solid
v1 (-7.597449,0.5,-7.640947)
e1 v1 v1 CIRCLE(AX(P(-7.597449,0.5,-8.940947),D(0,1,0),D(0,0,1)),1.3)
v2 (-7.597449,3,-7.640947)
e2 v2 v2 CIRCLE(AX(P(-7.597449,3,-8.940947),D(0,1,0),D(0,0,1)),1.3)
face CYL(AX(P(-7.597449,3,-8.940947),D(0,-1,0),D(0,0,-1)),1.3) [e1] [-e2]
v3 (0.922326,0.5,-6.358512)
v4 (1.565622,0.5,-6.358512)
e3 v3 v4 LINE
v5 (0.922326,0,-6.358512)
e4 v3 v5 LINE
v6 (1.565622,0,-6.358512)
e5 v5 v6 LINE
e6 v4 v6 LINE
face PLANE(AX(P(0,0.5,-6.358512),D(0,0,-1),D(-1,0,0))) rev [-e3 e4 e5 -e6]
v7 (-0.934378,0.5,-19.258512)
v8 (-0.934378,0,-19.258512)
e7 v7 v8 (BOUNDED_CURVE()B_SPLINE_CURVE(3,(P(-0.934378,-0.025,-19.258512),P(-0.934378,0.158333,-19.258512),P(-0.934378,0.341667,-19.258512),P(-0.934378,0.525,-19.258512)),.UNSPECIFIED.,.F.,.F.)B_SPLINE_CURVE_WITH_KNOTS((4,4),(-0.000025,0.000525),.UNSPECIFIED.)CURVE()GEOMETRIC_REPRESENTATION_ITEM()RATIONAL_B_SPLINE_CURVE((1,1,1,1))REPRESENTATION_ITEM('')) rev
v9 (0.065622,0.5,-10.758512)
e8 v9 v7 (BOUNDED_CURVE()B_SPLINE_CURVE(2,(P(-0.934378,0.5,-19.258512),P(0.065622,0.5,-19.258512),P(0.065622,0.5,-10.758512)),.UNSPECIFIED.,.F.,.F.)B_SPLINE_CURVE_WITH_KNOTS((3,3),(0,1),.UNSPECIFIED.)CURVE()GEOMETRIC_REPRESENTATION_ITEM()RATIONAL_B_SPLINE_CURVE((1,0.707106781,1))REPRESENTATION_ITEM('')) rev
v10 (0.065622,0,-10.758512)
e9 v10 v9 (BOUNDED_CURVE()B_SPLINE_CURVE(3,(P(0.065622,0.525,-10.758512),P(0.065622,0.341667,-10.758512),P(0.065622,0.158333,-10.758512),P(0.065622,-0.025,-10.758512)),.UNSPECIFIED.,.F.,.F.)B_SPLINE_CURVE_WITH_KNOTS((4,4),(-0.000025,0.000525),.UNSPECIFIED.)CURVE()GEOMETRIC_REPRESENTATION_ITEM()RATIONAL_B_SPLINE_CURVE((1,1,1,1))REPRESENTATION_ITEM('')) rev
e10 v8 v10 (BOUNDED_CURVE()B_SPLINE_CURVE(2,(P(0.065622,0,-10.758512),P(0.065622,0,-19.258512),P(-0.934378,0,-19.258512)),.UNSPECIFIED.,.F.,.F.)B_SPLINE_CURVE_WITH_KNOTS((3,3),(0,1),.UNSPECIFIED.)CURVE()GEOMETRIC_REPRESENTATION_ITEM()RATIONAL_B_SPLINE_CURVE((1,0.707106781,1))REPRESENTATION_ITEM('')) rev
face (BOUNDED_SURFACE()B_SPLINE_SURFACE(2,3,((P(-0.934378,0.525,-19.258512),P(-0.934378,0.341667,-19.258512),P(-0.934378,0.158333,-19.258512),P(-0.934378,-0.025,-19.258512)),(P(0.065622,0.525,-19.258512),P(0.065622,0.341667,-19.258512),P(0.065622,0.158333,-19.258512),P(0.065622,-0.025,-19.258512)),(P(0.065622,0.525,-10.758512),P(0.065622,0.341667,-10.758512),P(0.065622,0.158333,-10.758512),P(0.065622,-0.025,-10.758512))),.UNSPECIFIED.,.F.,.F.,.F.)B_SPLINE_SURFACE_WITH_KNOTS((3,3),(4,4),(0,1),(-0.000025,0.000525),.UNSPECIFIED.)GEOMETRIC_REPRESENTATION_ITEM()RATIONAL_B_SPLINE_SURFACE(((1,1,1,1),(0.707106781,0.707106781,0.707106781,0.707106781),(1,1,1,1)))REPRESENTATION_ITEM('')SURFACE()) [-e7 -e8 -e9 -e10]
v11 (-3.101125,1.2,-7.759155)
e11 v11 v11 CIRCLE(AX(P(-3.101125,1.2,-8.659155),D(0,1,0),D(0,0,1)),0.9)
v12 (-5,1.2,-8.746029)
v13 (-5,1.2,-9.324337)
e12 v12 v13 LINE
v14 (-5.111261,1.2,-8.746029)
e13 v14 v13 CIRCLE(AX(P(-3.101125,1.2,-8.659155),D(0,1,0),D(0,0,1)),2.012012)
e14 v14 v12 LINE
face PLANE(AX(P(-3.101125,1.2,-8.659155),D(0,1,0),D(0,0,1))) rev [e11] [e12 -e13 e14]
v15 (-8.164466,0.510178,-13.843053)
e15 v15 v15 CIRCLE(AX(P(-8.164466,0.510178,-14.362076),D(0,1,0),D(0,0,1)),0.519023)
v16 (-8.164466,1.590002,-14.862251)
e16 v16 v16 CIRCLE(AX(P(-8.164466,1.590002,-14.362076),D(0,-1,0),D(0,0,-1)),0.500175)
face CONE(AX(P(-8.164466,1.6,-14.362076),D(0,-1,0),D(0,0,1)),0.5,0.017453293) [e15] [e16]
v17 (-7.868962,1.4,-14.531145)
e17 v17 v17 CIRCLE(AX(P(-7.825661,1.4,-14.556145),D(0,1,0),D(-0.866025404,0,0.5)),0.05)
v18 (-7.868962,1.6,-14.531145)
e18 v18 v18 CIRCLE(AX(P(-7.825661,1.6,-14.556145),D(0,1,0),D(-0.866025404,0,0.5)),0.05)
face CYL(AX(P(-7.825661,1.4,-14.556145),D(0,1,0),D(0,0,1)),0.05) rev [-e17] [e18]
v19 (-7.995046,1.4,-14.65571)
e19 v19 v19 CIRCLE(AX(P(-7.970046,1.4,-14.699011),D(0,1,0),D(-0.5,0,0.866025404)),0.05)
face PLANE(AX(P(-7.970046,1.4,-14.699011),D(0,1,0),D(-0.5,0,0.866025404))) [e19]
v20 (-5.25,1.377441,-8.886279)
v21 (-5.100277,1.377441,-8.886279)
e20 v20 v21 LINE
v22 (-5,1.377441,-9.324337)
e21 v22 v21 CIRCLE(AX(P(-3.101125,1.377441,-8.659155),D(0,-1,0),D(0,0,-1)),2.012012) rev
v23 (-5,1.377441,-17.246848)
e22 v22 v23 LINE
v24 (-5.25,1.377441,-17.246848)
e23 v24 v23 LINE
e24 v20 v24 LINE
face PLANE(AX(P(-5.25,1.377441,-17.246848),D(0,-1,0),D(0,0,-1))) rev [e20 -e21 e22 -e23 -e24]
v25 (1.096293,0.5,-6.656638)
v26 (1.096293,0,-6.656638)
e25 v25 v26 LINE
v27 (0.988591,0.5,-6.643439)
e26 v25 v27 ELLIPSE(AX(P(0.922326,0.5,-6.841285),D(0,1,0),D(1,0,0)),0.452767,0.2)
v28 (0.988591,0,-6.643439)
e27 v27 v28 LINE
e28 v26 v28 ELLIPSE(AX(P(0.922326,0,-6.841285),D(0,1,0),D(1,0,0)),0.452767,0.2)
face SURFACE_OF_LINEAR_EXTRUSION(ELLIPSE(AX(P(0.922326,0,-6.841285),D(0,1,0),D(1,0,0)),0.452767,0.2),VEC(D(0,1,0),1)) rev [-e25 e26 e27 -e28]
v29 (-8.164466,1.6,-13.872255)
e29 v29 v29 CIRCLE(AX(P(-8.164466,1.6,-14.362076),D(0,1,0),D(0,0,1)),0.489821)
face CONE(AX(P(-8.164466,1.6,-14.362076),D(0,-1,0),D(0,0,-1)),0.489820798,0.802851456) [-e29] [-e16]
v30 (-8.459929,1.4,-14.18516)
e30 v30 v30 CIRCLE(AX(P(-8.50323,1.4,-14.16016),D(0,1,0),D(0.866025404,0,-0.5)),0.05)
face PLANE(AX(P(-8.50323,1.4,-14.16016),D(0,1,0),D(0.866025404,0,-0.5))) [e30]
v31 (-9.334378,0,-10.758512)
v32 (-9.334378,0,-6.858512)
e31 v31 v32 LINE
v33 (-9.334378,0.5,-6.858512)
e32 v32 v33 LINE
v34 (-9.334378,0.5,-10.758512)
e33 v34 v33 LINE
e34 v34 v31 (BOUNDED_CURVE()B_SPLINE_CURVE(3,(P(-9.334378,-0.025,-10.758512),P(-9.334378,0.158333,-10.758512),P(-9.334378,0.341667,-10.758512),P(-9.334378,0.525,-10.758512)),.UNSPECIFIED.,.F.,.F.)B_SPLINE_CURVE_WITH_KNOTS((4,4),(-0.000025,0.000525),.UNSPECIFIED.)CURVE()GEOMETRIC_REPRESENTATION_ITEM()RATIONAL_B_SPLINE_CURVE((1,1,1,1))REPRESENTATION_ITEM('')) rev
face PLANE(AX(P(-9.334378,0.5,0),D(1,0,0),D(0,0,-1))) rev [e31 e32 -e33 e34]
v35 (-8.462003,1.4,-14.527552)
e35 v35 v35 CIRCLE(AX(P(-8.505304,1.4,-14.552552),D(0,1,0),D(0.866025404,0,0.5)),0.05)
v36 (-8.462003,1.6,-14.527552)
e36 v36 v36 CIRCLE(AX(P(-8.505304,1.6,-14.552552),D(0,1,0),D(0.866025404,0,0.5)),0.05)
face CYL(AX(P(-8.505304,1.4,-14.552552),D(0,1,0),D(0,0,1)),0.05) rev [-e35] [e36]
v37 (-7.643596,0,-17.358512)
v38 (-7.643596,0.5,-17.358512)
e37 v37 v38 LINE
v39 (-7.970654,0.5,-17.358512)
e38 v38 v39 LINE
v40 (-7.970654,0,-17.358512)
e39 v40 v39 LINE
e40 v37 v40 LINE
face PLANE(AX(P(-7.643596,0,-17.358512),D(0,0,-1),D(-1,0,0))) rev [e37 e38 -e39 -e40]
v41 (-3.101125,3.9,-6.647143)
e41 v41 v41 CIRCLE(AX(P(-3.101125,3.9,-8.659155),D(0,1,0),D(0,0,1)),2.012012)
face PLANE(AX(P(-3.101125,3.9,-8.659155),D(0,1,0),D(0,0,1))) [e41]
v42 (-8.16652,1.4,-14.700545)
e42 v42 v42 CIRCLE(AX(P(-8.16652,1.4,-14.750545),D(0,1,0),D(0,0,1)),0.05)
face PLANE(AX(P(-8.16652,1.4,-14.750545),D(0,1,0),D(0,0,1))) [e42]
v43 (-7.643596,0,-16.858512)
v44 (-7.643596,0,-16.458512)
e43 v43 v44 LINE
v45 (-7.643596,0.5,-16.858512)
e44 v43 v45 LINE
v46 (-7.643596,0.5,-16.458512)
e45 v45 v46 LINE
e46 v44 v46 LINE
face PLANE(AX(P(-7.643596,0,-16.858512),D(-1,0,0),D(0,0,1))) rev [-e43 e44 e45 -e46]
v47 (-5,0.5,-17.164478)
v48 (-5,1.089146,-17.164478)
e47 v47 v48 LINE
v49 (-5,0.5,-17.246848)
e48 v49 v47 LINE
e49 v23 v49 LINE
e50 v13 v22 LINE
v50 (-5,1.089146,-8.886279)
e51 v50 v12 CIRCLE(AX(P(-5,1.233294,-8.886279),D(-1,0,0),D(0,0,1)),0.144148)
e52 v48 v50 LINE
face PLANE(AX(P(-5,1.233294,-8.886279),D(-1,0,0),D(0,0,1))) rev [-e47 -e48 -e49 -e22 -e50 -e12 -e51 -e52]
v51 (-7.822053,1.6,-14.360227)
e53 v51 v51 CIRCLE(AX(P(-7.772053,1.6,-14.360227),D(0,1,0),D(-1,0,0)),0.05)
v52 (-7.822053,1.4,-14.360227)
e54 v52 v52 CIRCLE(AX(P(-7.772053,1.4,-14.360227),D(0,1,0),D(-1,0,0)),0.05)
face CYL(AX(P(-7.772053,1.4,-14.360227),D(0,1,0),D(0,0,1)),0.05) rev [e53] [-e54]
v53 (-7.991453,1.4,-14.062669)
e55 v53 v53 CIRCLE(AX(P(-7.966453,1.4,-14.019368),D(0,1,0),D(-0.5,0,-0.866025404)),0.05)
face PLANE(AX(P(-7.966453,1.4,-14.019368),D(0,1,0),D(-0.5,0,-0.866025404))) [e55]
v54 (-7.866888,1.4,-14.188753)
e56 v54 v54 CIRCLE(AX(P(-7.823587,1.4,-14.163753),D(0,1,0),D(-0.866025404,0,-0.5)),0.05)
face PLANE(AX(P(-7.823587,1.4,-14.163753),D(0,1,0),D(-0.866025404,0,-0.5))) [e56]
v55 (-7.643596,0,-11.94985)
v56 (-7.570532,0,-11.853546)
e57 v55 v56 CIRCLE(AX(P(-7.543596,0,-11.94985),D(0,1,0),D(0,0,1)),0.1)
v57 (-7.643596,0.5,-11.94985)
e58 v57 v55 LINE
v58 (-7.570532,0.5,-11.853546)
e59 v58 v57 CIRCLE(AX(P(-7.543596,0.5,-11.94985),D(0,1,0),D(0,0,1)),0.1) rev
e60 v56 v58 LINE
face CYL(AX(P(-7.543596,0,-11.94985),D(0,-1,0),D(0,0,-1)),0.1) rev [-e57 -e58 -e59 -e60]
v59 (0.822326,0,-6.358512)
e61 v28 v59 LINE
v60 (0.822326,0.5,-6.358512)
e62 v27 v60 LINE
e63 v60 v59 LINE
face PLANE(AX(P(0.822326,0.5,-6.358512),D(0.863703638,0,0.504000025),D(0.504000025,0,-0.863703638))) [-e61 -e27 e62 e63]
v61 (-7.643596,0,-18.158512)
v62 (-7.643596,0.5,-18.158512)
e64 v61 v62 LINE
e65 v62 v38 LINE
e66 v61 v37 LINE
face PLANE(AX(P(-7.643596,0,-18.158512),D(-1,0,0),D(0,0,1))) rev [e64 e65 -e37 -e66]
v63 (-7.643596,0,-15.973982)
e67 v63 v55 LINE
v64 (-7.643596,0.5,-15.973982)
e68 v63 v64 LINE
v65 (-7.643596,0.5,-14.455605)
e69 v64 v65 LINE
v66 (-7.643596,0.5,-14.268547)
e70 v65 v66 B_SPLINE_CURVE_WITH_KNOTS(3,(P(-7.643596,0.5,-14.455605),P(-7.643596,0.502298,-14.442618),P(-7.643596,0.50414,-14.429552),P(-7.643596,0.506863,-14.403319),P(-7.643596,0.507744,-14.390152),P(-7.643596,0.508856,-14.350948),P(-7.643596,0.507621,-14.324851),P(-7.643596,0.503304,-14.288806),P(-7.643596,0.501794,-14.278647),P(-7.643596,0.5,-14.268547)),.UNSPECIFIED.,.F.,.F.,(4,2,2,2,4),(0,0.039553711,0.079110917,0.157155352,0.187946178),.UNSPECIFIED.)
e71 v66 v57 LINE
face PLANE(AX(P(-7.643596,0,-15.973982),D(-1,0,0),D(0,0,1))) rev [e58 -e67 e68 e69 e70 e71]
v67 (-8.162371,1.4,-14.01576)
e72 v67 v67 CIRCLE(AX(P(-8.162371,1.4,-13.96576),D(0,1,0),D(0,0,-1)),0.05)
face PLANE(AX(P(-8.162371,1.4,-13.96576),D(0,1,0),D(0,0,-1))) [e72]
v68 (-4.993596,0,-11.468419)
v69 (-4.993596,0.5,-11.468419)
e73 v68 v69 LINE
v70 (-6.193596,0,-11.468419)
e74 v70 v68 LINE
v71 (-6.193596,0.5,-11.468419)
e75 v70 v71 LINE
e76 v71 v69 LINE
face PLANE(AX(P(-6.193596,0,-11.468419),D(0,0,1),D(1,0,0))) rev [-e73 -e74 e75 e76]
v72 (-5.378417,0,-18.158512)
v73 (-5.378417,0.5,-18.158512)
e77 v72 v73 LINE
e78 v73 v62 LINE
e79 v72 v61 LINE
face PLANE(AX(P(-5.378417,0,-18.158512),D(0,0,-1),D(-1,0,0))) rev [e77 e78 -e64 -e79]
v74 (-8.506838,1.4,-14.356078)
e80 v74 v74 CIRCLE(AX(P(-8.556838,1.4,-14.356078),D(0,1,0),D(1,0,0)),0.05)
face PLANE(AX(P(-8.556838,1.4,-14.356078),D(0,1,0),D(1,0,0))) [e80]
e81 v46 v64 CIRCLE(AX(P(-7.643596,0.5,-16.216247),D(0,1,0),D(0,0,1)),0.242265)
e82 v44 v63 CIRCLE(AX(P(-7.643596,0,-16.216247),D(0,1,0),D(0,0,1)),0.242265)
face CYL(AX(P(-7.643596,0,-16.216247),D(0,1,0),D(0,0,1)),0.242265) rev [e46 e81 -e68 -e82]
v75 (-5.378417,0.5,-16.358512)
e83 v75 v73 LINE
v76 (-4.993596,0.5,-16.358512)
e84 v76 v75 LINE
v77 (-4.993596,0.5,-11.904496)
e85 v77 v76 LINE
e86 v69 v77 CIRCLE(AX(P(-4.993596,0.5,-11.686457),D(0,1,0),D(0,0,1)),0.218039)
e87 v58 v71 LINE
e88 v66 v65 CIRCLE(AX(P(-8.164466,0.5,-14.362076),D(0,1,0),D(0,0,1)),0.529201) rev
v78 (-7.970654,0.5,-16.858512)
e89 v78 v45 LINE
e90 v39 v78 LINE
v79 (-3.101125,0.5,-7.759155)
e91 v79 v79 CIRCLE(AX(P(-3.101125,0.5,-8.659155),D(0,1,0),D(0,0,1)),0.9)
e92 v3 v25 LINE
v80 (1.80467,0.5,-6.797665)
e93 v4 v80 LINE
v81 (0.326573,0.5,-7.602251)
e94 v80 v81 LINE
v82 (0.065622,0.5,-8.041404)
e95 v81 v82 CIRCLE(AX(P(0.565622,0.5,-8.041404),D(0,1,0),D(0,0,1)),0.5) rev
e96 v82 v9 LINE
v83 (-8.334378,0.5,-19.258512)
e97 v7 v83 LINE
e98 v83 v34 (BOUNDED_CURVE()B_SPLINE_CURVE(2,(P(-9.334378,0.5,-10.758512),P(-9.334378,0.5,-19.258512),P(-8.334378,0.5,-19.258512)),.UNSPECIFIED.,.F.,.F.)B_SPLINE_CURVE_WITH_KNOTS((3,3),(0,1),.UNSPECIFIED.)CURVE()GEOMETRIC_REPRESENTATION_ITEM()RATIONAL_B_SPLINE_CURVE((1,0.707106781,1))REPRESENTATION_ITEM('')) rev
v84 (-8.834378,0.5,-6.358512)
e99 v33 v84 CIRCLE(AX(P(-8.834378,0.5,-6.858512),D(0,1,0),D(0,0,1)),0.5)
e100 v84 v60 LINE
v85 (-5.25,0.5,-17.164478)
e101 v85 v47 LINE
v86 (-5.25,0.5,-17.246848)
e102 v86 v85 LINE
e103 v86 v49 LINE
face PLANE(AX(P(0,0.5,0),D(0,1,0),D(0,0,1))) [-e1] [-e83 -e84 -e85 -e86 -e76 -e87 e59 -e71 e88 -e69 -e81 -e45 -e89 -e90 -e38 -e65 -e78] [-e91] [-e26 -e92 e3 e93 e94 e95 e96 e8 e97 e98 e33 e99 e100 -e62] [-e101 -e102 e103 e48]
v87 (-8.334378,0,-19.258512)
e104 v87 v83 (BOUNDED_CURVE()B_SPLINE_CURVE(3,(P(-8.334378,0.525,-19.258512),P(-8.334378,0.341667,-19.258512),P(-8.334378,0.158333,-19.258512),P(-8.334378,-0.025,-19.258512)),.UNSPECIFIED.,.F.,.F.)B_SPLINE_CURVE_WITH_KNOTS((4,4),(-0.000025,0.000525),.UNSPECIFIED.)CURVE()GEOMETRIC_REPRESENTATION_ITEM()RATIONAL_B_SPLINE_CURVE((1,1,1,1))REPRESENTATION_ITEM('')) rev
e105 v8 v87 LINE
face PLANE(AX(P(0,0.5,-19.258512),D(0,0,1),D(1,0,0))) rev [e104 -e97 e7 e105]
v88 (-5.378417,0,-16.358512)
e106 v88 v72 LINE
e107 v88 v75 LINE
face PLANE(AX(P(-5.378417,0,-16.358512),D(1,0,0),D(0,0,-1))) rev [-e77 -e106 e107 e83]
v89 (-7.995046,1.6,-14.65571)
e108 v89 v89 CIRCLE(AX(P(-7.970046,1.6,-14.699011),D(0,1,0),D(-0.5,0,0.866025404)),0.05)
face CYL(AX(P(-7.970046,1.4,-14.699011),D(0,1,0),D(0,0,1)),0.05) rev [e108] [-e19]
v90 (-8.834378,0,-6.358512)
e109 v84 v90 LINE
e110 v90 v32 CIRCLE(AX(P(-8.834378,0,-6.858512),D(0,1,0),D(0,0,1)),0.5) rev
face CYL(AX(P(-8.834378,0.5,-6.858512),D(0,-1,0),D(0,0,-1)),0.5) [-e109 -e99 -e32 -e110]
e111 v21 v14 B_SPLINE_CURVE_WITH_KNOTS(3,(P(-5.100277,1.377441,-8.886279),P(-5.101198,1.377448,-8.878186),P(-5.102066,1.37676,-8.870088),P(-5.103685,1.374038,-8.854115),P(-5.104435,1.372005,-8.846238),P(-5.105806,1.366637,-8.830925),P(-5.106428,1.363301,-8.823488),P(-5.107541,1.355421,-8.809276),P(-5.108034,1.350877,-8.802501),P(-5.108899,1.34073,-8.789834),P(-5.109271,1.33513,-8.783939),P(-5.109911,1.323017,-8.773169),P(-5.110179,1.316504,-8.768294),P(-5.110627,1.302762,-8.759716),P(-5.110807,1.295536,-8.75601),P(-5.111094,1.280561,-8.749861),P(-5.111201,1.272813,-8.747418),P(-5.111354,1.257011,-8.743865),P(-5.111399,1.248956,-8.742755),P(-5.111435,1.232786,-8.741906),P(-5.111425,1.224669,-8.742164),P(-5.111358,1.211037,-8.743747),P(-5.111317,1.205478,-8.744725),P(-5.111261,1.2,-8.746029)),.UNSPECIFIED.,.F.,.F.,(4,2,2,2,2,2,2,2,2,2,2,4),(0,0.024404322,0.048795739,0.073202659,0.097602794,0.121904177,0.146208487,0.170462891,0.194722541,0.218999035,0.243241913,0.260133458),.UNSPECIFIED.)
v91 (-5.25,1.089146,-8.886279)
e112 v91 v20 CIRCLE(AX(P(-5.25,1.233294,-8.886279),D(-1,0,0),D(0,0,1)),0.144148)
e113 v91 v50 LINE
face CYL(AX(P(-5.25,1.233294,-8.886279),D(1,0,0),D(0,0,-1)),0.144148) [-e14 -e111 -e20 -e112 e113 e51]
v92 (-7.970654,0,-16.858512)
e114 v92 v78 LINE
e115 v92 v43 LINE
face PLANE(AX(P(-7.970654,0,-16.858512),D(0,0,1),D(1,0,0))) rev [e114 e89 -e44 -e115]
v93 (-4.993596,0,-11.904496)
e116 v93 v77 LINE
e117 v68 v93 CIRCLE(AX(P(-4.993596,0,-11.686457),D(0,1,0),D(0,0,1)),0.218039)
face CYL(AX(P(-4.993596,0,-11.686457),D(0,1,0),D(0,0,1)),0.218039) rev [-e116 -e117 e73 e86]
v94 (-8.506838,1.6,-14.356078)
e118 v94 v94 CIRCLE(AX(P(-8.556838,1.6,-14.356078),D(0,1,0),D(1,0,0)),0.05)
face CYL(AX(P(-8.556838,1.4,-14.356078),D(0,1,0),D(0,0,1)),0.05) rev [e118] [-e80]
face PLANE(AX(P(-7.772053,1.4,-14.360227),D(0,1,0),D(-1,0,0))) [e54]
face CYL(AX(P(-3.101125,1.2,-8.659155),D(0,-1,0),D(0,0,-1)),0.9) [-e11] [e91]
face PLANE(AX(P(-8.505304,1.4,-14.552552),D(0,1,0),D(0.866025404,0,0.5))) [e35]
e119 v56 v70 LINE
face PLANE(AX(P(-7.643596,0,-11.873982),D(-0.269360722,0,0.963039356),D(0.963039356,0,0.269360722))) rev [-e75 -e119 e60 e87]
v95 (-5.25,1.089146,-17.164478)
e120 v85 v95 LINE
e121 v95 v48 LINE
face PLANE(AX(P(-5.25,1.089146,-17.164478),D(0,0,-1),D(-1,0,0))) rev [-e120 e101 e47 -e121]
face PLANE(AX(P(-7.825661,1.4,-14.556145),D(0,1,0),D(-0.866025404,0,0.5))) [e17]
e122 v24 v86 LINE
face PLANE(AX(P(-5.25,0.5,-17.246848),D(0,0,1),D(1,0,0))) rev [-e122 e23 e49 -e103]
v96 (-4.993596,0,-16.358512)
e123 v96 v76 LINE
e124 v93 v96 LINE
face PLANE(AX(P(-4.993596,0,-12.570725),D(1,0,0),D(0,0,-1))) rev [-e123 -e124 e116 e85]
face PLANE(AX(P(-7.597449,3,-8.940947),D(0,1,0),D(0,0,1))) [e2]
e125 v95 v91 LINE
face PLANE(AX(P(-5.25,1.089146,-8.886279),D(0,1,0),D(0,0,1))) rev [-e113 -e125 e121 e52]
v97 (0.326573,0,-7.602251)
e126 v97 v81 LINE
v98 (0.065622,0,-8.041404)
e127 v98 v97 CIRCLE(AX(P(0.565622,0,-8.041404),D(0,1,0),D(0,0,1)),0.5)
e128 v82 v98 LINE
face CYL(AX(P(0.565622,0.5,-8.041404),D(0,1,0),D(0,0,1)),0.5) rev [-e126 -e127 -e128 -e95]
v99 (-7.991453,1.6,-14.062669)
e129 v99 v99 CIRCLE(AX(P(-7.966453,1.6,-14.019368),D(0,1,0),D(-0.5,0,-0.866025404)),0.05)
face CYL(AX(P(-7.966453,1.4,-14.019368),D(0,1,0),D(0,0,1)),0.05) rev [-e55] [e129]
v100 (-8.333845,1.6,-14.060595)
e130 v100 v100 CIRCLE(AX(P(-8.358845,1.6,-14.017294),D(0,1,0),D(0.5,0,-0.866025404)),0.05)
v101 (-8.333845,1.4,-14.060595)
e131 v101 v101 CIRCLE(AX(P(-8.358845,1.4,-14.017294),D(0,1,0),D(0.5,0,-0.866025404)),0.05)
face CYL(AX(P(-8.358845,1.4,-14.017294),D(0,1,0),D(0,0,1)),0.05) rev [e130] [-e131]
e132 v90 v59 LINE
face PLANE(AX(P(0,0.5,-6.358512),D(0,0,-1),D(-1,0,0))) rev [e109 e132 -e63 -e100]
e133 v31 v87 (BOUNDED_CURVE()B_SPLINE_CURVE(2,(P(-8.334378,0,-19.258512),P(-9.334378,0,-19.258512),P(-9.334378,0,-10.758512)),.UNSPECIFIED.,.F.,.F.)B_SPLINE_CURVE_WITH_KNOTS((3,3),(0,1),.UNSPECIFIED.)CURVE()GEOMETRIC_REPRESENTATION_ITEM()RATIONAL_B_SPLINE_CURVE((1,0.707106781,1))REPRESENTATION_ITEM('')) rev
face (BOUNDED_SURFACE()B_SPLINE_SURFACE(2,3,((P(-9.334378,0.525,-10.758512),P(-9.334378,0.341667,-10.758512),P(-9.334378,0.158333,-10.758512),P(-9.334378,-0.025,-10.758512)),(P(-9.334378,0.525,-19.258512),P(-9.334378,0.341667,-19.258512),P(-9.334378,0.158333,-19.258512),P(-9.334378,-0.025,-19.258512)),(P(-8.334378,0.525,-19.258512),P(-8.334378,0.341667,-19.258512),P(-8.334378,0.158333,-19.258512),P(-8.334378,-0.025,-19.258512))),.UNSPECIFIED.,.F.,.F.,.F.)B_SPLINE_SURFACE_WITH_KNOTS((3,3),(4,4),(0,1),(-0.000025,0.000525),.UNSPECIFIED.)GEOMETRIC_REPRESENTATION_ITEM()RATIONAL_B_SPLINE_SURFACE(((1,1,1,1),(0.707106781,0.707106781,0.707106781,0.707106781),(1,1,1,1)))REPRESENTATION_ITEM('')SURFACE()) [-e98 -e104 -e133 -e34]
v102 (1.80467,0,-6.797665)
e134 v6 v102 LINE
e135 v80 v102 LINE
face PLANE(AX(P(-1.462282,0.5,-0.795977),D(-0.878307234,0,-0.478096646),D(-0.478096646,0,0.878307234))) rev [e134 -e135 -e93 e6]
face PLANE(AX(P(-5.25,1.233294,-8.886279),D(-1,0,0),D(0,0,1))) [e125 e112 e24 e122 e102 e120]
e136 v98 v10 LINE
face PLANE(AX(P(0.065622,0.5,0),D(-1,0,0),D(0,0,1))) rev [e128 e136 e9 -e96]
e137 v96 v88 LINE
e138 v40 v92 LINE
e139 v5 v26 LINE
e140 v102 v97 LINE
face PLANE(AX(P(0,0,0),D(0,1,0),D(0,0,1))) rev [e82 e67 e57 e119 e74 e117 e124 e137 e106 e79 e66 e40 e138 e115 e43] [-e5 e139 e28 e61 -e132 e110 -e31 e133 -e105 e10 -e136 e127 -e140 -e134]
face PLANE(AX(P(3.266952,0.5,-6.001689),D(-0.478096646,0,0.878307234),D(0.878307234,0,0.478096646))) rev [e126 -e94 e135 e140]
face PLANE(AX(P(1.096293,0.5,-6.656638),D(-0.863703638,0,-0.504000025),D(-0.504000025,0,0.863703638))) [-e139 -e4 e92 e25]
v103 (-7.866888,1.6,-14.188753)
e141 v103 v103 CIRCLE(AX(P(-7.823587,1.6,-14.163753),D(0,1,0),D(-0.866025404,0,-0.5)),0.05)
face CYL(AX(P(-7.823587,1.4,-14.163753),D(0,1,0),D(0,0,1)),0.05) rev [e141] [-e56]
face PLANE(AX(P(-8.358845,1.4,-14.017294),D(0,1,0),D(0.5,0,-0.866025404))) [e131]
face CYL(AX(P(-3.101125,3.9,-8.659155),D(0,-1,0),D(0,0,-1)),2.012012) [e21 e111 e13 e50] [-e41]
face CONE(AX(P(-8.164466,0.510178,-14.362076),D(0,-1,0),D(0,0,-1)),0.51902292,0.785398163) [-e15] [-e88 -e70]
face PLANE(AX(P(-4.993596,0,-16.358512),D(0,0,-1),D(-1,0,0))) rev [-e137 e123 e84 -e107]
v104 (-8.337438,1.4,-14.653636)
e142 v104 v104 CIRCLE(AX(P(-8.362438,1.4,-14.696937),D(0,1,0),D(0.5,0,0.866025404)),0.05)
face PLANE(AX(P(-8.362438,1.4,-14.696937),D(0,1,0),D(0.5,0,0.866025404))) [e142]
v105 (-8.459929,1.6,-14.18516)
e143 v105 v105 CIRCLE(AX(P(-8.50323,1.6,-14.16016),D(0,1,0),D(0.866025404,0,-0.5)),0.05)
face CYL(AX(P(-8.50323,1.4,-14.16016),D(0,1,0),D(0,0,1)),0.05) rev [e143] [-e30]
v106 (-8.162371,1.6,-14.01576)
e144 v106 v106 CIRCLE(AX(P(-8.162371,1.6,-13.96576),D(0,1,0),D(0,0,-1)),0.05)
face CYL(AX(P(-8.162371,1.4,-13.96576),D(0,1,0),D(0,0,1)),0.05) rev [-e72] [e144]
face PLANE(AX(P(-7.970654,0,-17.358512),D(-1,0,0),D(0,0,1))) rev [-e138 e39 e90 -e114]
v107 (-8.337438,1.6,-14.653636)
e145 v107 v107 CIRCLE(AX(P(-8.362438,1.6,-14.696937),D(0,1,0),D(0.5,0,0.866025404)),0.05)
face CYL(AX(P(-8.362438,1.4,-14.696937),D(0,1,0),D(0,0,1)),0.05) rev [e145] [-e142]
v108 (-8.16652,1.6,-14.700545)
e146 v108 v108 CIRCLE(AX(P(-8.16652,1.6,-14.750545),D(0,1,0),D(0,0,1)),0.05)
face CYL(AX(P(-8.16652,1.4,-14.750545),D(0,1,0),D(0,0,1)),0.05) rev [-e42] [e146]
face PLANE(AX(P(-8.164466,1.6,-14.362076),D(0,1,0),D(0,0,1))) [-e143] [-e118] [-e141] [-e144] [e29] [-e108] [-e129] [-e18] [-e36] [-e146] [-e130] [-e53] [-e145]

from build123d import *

# Parameters (mm, degrees)
SKETCH1_W           = 9.4
SKETCH1_H           = 12.9
BOSS_EXTRUDE1_DEPTH = 0.5
FILLET4_R           = 0.5
FILLET7_R           = 0.5
FILLET8_SIZE        = 1
FILLET8_SIZE_2      = 8.5
FILLET9_SIZE        = 8.5
FILLET9_SIZE_2      = 1
SKETCH2_RX          = 0.452766649
SKETCH2_RY          = 0.2
CUT_EXTRUDE1_DEPTH  = 0.5
CUT_EXTRUDE2_DEPTH  = 0.5
CUT_EXTRUDE3_DEPTH  = 0.5
BOSS_EXTRUDE2_DEPTH = 0.25
SKETCH6_R           = 0.5
BOSS_EXTRUDE3_DEPTH = 0.7
SKETCH7_R           = 0.5
BOSS_EXTRUDE4_DEPTH = 0.4
DRAFT1_ANGLE        = 1
SKETCH17_R          = 0.05
CUT_EXTRUDE6_DEPTH  = 0.2
CIRPATTERN1_COUNT   = 12
CHAMFER3_SIZE       = 0.01
CHAMFER3_SIZE_2     = 0.010179202
SKETCH22_R          = 1.3
BOSS_EXTRUDE6_DEPTH = 2.5
SKETCH23_R          = 0.9
BOSS_EXTRUDE8_DEPTH = 0.7
SKETCH24_R          = 2.012011857
BOSS_EXTRUDE9_DEPTH = 2.7
FILLET12_R          = 0.1


with BuildPart() as part:
    # Sketch1 → Boss-Extrude1 (new body)
    with BuildSketch(Plane(origin=(0, 0, 0), x_dir=(1, 0, 0), z_dir=(0, 1, 0))):
        Polygon((0.065621543, 7.744296826), (0.065621543, 6.358511849), (1.565621543, 6.358511849), (1.804669866, 6.797665466), align=None)
        with Locations((-4.634378457, 12.808511849)):
            Rectangle(SKETCH1_W, SKETCH1_H)
    extrude(amount=BOSS_EXTRUDE1_DEPTH)

    # Fillet4
    fillet4_edges = [part.edges().sort_by_distance(p)[0] for p in [
        (0.065621543, 0.25, -7.744296826),
    ]]
    fillet(fillet4_edges, radius=FILLET4_R)

    # Fillet7
    fillet7_edges = [part.edges().sort_by_distance(p)[0] for p in [
        (-9.334378457, 0.25, -6.358511849),
    ]]
    fillet(fillet7_edges, radius=FILLET7_R)

    # Fillet8
    # an asymmetric fillet: 8.5, 1 mm, written as the material it takes off along each edge
    with BuildSketch(Plane(origin=(0.065621543, -21.25, -19.258511849), x_dir=(-1, 0, 0), z_dir=(0, 1, 0))) as fillet8_piece_1:
        with BuildLine():
            Bezier((FILLET8_SIZE, 0), (0, 0), (0, FILLET8_SIZE_2), weights=[1, 0.707106781, 1])
            Line((0, FILLET8_SIZE_2), (0, 0))
            Line((0, 0), (FILLET8_SIZE, 0))
        make_face()
    extrude(amount=43, mode=Mode.SUBTRACT)

    # Fillet9
    # an asymmetric fillet: 8.5, 1 mm, written as the material it takes off along each edge
    with BuildSketch(Plane(origin=(-9.334378457, -21.25, -19.258511849), x_dir=(0, 0, 1), z_dir=(0, 1, 0))) as fillet9_piece_1:
        with BuildLine():
            Bezier((FILLET9_SIZE, 0), (0, 0), (0, FILLET9_SIZE_2), weights=[1, 0.707106781, 1])
            Line((0, FILLET9_SIZE_2), (0, 0))
            Line((0, 0), (FILLET9_SIZE, 0))
        make_face()
    extrude(amount=43, mode=Mode.SUBTRACT)

    # Sketch2 → Cut-Extrude1 (cut)
    with BuildSketch(Plane(origin=(0, 0.5, 0), x_dir=(1, 0, 0), z_dir=(0, 1, 0))):
        with Locations(Location((0.922326291, 6.84128542), (0, 0, 180))):
            Ellipse(SKETCH2_RX, SKETCH2_RY)
    extrude(amount=-CUT_EXTRUDE1_DEPTH, mode=Mode.SUBTRACT)

    # Sketch3 → Cut-Extrude2 (cut)
    with BuildSketch(Plane(origin=(0, 0, 0), x_dir=(1, 0, 0), z_dir=(0, 1, 0))):
        Polygon((1.096292862, 6.656637946), (0.922326291, 6.358511849), (0.822326291, 6.358511849), (0.988590825, 6.643438984), align=None)
    extrude(amount=CUT_EXTRUDE2_DEPTH, mode=Mode.SUBTRACT)

    # Sketch4 → Cut-Extrude3 (cut)
    with BuildSketch(Plane(origin=(0, 0.5, 0), x_dir=(1, 0, 0), z_dir=(0, 1, 0))):
        with BuildLine():
            Line((-7.643596283, 18.158511849), (-7.643596283, 17.358511849))
            Line((-7.643596283, 17.358511849), (-7.970654201, 17.358511849))
            Line((-7.970654201, 17.358511849), (-7.970654201, 16.858511849))
            Line((-7.970654201, 16.858511849), (-7.643596283, 16.858511849))
            Line((-7.643596283, 16.858511849), (-7.643596283, 16.458511849))
            ThreePointArc((-7.643596283, 16.458511849), (-7.885861407, 16.216246725), (-7.643596283, 15.973981601))
            Line((-7.643596283, 15.973981601), (-7.643596283, 11.873981601))
            Line((-7.643596283, 11.873981601), (-6.193596283, 11.468418687))
            Line((-6.193596283, 11.468418687), (-4.993596283, 11.468418687))
            ThreePointArc((-4.993596283, 11.468418687), (-4.775557671, 11.686457299), (-4.993596283, 11.904495911))
            Line((-4.993596283, 11.904495911), (-4.993596283, 12.570725002))
            Line((-4.993596283, 12.570725002), (-4.993596283, 16.358511849))
            Line((-4.993596283, 16.358511849), (-5.378417371, 16.358511849))
            Line((-5.378417371, 16.358511849), (-5.378417371, 18.158511849))
            Line((-5.378417371, 18.158511849), (-7.643596283, 18.158511849))
        make_face()
    extrude(amount=-CUT_EXTRUDE3_DEPTH, mode=Mode.SUBTRACT)

    # Sketch5 → Boss-Extrude2 (add)
    with BuildSketch(Plane.ZY.offset(5)):
        with BuildLine():
            Line((-17.246848227, 0.5), (-17.246848227, 1.377441322))
            Line((-17.246848227, 1.377441322), (-8.88627879, 1.377441322))
            ThreePointArc((-8.88627879, 1.377441322), (-8.742131041, 1.233293573), (-8.88627879, 1.089145824))
            Line((-8.88627879, 1.089145824), (-17.164478085, 1.089145824))
            Line((-17.164478085, 1.089145824), (-17.164478085, 0.5))
            Line((-17.164478085, 0.5), (-17.246848227, 0.5))
        make_face()
    extrude(amount=BOSS_EXTRUDE2_DEPTH)

    # Sketch6 → Boss-Extrude3 (add)
    with BuildSketch(Plane(origin=(0, 0.5, 0), x_dir=(1, 0, 0), z_dir=(0, 1, 0))):
        with Locations(Location((-8.1644663, 14.36207626, 0), (0, 0, 270))):
            Circle(SKETCH6_R)
    extrude(amount=BOSS_EXTRUDE3_DEPTH)

    # Sketch7 → Boss-Extrude4 (add)
    with BuildSketch(Plane(origin=(0, 1.2, 0), x_dir=(1, 0, 0), z_dir=(0, 1, 0))):
        with Locations(Location((-8.1644663, 14.36207626, 0), (0, 0, 270))):
            Circle(SKETCH7_R)
    extrude(amount=BOSS_EXTRUDE4_DEPTH)

    # Draft1
    draft1_faces = [part.faces().sort_by_distance(p)[0] for p in [
        (-8.1644663, 1.05, -14.86207626),
    ]]
    draft(draft1_faces, Plane(origin=(-8.1644663, 1.6, -14.36207626), x_dir=(0, 0, 1), z_dir=(0, 1, 0)), DRAFT1_ANGLE)

    # Sketch17 → Cut-Extrude6 (cut)
    with BuildSketch(Plane(origin=(0, 1.6, 0), x_dir=(1, 0, 0), z_dir=(0, 1, 0))):
        with Locations(Location((-8.16651982, 14.750544579, 0), (0, 0, 270))):
            Circle(SKETCH17_R)
    cut_extrude6 = extrude(amount=-CUT_EXTRUDE6_DEPTH, mode=Mode.SUBTRACT)

    # CirPattern1: Cut-Extrude6 ×12 about axis
    cirpattern1_axis = Axis((-8.164445557, 0, -14.358152338), (0, 1, 0))
    for i in range(1, CIRPATTERN1_COUNT):
        add(cut_extrude6.rotate(cirpattern1_axis, i * 360 / CIRPATTERN1_COUNT), mode=Mode.SUBTRACT)

    # Chamfer3
    # the kernel refuses this chamfer: 0.010179202, 0.01 mm, written as the material it adds along each edge
    with BuildSketch(Plane(origin=(-8.1644663, 0.5, -14.36207626), x_dir=(0, 0, 1), z_dir=(-1, 0, 0))) as chamfer3_piece_1_section:
        Polygon((0.519200571 + CHAMFER3_SIZE, 0), (0.519200571 - CHAMFER3_SIZE_2 * 0.0174524062842, CHAMFER3_SIZE_2 * 0.999847686386), (0.519200571, 0), align=None)
    chamfer3_piece_1 = revolve(axis=Axis((-8.1644663, 0.5, -14.36207626), (0, 1, 0)), mode=Mode.PRIVATE)
    chamfer3_piece_1 = split(chamfer3_piece_1, bisect_by=Plane(origin=(-7.643596283, 0.504689418, -14.885788598), z_dir=(-1, 0, 0)), keep=Keep.TOP, mode=Mode.PRIVATE)
    add(chamfer3_piece_1)
    # the kernel refuses this chamfer: 0.010179202, 0.01 mm, written as the material it takes off along each edge
    with BuildSketch(Plane(origin=(-8.1644663, 1.6, -14.36207626), x_dir=(0, 0, 1), z_dir=(-1, 0, 0))) as chamfer3_2_piece_1:
        Polygon((0.5 + CHAMFER3_SIZE * 0.0174524064372, -CHAMFER3_SIZE * 0.999847695156), (0.5 - CHAMFER3_SIZE_2 * 0.999999991228, 0), (0.5, 0), align=None)
    revolve(axis=Axis((-8.1644663, 1.6, -14.36207626), (0, 1, 0)), mode=Mode.SUBTRACT)

    # Sketch22 → Boss-Extrude6 (add)
    with BuildSketch(Plane(origin=(0, 0.5, 0), x_dir=(1, 0, 0), z_dir=(0, 1, 0))):
        with Locations(Location((-7.597449318, 8.940947153, 0), (0, 0, 270))):
            Circle(SKETCH22_R)
    extrude(amount=BOSS_EXTRUDE6_DEPTH)

    # Sketch23 → Boss-Extrude8 (add)
    with BuildSketch(Plane(origin=(0, 0.5, 0), x_dir=(1, 0, 0), z_dir=(0, 1, 0))):
        with Locations(Location((-3.101125203, 8.659155236, 0), (0, 0, 270))):
            Circle(SKETCH23_R)
    extrude(amount=BOSS_EXTRUDE8_DEPTH)

    # Sketch24 → Boss-Extrude9 (add)
    with BuildSketch(Plane(origin=(0, 1.2, 0), x_dir=(1, 0, 0), z_dir=(0, 1, 0))):
        with Locations(Location((-3.101125203, 8.659155236, 0), (0, 0, 160.694494452))):
            Circle(SKETCH24_R)
    extrude(amount=BOSS_EXTRUDE9_DEPTH)

    # Fillet12
    fillet12_edges = [part.edges().sort_by_distance(p)[0] for p in [
        (-7.643596283, 0.25, -11.873981601),
    ]]
    fillet(fillet12_edges, radius=FILLET12_R)


solid = part.part
